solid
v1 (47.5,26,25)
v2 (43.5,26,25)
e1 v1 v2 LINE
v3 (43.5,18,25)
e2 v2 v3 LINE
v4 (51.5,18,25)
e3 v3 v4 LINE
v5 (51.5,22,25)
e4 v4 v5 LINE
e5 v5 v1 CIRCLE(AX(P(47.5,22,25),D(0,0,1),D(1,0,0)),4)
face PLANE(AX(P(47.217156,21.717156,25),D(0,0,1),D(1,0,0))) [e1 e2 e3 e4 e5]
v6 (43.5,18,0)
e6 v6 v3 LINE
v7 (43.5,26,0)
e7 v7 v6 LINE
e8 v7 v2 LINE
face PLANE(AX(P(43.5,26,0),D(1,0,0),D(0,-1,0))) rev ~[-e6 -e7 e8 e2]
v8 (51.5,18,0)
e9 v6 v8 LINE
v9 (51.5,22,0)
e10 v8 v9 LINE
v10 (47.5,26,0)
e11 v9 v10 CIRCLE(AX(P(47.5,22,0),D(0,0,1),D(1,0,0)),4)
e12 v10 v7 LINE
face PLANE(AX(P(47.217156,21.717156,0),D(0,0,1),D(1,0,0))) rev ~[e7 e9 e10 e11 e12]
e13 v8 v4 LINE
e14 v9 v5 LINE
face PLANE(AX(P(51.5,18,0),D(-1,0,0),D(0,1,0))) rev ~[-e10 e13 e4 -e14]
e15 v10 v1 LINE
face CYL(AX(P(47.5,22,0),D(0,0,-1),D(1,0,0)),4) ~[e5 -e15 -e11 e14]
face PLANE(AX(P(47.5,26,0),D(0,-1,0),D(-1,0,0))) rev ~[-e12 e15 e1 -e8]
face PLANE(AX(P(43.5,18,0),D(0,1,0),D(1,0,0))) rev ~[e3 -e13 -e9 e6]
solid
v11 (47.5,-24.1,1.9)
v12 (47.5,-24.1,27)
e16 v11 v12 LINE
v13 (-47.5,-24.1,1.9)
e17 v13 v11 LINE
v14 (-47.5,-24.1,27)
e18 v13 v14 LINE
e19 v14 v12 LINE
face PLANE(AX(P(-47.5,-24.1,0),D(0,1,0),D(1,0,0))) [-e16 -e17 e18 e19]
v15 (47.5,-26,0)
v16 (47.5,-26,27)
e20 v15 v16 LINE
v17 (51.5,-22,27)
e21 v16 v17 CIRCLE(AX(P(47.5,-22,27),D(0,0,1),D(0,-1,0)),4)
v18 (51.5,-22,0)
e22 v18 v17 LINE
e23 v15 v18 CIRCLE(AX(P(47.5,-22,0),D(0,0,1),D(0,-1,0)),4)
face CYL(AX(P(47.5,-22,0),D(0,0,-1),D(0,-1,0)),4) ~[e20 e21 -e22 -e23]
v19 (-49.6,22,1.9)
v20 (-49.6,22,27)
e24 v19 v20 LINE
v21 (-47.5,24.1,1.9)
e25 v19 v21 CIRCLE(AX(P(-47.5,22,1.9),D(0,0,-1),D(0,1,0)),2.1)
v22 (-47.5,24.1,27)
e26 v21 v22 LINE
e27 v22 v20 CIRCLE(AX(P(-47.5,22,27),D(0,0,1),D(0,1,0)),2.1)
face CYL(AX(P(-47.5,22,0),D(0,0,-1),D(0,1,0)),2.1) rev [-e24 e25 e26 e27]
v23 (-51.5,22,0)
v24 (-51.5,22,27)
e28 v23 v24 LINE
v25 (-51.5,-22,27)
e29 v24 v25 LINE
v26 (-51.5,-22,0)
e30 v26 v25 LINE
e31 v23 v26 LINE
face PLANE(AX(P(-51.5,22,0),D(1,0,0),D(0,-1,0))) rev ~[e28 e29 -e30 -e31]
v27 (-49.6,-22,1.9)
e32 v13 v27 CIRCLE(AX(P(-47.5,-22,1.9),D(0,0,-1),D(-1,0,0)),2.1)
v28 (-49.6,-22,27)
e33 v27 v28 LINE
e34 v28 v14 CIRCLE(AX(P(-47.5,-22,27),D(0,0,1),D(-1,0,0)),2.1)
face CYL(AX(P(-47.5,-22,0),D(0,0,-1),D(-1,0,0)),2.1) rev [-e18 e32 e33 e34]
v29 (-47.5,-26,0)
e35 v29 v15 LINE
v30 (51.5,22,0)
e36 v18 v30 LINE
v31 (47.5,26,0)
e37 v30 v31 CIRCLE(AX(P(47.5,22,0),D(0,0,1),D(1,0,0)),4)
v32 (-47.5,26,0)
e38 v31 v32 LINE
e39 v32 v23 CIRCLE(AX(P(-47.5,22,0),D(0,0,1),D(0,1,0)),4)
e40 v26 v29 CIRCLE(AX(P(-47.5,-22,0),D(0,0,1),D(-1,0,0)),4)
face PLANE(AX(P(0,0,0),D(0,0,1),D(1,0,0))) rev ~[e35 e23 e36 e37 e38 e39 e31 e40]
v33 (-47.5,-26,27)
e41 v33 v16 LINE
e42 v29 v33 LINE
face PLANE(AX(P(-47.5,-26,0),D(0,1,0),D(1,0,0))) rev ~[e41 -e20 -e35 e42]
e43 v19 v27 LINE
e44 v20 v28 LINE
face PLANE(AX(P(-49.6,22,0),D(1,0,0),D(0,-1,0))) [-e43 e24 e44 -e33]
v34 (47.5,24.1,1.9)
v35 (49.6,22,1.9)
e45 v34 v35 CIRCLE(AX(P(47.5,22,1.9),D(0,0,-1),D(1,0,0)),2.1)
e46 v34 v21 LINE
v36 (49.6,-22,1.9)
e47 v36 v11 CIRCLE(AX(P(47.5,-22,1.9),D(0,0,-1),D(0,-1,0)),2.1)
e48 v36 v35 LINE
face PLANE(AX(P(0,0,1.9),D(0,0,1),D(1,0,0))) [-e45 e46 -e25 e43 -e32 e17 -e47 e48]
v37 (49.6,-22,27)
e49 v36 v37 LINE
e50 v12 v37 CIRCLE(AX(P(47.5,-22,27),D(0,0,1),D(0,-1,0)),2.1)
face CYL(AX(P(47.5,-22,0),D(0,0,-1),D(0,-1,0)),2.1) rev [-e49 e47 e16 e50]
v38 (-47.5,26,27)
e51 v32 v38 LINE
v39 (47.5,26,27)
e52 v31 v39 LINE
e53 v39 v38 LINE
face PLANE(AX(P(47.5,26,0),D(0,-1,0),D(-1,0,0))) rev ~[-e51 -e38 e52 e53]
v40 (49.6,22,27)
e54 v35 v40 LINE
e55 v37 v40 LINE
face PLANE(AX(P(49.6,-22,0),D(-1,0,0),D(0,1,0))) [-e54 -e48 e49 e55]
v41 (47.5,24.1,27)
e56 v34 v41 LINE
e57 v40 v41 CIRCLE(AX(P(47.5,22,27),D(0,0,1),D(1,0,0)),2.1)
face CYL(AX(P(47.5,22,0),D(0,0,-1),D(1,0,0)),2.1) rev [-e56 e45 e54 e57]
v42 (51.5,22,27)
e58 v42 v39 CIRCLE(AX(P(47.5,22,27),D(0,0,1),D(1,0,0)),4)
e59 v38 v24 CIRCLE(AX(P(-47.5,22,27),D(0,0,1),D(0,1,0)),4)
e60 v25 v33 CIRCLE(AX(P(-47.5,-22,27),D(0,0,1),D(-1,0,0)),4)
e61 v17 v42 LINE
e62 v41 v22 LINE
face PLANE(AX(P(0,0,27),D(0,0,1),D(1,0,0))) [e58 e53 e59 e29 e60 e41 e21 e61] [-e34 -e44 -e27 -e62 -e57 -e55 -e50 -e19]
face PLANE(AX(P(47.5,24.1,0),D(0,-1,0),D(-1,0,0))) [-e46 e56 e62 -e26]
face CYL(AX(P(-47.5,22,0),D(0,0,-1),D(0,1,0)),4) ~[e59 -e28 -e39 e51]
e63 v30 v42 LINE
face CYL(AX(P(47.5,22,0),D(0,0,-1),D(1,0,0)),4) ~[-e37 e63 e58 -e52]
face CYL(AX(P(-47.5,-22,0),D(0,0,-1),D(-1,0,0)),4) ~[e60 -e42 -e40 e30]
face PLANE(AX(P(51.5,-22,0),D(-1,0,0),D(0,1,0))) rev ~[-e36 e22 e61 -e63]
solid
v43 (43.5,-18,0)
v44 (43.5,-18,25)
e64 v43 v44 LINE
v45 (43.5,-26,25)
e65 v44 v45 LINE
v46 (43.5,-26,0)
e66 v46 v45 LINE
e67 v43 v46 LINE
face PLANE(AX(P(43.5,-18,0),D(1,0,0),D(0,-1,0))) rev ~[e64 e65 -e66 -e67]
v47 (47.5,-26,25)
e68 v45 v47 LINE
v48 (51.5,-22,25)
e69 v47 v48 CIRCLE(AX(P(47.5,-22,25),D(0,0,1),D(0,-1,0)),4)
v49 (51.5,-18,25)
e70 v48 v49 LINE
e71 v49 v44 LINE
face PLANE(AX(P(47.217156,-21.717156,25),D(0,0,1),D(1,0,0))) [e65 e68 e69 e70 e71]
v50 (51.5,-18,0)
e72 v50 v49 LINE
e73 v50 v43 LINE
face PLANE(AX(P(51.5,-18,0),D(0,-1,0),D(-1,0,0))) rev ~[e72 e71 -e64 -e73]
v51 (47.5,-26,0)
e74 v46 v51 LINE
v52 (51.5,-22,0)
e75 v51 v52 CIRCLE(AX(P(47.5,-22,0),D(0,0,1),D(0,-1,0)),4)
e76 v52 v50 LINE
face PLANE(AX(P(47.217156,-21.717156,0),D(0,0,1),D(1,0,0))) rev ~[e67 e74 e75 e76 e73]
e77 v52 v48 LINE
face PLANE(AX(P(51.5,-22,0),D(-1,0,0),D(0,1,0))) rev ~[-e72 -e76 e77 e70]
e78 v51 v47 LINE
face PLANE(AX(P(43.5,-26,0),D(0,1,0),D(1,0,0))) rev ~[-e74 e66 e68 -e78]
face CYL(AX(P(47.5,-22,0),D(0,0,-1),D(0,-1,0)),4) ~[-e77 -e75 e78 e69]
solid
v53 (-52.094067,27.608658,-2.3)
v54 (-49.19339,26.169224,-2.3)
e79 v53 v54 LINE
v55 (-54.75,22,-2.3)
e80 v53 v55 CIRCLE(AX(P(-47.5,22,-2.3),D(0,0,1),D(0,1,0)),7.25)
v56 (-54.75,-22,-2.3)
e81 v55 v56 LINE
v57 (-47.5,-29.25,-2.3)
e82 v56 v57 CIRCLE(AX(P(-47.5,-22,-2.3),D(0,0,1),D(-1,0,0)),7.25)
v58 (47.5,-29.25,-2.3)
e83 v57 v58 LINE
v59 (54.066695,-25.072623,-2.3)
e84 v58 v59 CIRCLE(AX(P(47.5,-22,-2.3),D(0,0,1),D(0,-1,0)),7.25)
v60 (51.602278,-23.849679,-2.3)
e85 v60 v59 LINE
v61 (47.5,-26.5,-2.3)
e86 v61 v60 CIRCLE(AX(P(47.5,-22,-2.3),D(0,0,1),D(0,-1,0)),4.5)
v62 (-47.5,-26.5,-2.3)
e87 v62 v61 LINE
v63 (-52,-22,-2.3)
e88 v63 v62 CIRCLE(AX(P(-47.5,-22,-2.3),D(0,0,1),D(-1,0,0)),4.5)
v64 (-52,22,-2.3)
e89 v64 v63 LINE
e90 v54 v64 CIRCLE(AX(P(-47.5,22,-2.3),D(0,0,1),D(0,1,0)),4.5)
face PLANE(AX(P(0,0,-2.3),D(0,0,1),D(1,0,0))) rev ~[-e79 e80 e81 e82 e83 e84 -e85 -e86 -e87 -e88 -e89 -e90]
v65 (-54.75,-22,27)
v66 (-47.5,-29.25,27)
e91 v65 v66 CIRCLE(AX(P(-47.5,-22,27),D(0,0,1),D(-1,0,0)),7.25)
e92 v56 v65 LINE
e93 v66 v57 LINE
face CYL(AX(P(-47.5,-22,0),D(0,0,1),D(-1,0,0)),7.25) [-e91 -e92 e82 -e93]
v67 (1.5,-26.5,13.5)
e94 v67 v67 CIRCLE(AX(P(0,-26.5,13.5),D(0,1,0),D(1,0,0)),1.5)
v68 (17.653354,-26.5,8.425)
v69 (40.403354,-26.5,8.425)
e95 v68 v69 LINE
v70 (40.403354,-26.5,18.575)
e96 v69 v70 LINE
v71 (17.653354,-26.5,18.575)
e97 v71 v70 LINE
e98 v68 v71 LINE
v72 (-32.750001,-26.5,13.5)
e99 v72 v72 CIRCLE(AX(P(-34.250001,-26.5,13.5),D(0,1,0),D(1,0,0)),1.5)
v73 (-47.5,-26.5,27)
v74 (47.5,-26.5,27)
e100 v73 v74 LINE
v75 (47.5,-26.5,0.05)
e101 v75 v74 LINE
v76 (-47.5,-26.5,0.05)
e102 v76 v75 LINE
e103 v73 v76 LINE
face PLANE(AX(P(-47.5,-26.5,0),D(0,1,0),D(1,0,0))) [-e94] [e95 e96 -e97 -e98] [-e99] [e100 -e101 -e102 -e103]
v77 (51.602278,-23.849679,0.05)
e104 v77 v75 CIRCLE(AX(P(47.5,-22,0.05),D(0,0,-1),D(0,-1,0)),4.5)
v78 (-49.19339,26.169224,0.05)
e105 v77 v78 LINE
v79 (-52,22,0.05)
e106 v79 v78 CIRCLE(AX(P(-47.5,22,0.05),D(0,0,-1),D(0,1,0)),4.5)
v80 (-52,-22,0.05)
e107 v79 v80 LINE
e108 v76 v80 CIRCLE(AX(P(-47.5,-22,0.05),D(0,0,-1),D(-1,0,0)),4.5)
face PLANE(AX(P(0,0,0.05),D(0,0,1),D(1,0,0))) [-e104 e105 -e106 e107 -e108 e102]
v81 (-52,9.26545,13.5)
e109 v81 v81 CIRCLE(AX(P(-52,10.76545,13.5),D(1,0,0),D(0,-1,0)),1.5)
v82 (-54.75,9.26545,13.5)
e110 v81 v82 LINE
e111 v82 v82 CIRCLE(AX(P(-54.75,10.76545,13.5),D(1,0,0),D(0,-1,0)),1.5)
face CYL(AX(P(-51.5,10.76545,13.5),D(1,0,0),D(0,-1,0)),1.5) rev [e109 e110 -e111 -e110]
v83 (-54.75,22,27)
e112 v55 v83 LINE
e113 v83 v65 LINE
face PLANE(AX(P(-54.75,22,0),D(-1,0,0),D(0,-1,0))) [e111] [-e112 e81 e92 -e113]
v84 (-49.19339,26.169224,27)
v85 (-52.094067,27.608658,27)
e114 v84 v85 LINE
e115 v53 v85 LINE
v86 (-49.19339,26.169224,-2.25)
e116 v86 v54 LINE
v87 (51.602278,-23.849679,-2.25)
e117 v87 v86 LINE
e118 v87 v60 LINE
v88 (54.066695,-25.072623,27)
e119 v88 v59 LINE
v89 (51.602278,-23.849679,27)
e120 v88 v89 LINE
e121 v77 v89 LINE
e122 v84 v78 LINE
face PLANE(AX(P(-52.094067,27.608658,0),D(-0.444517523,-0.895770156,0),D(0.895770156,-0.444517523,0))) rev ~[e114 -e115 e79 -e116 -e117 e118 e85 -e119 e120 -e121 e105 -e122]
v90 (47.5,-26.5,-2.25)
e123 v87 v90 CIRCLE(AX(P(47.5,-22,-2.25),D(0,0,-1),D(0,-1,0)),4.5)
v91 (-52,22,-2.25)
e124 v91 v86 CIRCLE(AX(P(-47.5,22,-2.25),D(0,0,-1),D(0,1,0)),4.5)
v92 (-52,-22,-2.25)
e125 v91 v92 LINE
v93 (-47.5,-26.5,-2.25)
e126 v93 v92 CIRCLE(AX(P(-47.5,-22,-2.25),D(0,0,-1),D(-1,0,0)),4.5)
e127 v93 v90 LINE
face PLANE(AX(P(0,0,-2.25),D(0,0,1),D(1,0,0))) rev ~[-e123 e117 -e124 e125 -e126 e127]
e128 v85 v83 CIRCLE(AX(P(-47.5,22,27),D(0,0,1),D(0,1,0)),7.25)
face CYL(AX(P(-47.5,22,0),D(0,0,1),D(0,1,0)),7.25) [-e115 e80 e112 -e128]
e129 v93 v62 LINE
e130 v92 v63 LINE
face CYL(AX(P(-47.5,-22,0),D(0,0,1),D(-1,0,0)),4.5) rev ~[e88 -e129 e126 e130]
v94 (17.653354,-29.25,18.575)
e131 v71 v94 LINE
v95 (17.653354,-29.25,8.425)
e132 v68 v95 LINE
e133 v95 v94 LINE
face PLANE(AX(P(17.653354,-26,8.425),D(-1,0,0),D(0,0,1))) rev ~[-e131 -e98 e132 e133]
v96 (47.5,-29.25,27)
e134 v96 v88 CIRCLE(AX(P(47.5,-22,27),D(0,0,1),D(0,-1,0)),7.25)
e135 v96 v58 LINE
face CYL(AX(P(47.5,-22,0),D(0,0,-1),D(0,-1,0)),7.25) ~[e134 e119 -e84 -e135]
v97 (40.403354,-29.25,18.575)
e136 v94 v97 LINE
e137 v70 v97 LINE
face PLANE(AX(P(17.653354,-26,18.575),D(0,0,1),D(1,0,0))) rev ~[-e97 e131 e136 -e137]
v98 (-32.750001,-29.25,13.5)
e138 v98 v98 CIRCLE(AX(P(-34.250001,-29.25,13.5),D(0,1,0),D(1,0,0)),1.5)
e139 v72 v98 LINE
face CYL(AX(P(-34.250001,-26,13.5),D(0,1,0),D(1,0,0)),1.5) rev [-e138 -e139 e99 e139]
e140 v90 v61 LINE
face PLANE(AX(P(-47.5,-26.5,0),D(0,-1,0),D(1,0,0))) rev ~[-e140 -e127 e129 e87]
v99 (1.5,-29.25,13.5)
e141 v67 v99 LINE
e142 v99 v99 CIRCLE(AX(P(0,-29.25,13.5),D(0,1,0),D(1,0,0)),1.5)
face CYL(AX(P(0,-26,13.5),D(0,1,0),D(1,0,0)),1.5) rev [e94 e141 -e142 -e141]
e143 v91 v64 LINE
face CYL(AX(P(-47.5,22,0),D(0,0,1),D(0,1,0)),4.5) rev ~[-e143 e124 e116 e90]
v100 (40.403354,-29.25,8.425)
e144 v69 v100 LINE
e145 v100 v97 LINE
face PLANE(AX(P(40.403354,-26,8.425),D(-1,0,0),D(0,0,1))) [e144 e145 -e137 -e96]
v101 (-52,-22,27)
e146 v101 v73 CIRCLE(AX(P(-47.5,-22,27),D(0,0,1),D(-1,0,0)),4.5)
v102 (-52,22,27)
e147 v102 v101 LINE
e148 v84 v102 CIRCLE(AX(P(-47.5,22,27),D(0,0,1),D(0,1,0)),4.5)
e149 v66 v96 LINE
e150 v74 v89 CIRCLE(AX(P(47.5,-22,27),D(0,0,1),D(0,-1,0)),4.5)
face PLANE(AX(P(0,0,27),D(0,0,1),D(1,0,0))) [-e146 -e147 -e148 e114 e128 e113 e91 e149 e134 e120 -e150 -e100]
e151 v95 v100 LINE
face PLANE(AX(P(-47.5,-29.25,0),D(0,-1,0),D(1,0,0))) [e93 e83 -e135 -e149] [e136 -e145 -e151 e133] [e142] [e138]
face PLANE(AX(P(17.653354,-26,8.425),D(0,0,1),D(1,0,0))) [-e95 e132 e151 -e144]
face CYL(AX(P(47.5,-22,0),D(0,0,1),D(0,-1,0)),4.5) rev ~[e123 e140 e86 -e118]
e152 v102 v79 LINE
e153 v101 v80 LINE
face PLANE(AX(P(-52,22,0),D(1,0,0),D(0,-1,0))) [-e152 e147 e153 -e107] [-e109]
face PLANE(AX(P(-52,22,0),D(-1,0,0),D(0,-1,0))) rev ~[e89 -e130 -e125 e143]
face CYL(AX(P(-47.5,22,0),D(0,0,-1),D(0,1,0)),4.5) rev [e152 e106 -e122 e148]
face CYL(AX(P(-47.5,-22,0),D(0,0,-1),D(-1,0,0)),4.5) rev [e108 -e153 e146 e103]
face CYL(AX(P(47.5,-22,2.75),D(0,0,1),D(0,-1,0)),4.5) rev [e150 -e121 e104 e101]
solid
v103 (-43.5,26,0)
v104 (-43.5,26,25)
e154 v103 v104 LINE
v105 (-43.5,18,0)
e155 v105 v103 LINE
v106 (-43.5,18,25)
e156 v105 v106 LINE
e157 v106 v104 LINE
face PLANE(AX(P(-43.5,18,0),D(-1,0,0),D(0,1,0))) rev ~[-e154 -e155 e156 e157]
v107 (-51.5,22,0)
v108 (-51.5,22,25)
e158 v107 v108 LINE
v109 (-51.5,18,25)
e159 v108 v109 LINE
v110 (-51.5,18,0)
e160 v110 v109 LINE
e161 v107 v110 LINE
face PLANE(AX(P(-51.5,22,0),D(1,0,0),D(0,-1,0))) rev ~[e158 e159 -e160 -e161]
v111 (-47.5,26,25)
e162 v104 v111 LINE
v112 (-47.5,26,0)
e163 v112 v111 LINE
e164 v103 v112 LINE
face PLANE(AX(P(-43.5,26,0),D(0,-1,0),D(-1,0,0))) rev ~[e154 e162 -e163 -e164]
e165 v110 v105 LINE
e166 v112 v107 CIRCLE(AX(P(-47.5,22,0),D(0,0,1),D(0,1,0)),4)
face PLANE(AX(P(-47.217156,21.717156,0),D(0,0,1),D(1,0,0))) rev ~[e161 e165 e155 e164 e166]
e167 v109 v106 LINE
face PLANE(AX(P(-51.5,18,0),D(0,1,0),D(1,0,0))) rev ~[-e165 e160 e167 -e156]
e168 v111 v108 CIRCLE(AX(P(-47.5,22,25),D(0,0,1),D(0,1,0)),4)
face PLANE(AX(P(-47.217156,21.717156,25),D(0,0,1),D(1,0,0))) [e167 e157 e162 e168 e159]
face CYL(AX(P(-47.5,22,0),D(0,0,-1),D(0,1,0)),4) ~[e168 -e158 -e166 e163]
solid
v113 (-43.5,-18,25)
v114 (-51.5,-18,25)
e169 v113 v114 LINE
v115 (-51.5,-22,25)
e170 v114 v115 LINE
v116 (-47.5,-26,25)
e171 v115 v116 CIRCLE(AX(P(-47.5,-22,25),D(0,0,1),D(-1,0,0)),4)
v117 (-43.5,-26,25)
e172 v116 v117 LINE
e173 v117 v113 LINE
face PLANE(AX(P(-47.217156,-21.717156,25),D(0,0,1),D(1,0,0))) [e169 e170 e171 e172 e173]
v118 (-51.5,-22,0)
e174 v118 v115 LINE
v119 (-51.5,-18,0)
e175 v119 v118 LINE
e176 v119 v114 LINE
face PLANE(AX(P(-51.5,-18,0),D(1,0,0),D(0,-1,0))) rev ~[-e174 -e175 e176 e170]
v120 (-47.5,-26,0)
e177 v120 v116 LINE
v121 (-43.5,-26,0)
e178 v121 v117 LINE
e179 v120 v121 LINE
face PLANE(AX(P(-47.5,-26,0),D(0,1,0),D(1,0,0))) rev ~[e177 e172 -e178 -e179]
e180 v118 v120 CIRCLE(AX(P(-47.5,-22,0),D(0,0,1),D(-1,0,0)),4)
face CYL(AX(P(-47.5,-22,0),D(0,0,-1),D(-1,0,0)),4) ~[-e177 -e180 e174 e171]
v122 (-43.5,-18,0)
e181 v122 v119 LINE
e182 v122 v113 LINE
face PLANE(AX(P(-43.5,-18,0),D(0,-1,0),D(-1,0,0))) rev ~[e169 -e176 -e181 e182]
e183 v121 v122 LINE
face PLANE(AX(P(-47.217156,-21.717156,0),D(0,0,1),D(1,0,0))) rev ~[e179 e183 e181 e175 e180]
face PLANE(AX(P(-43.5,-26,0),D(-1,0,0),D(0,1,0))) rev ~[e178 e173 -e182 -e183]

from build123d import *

# Parameters (mm, degrees)
F1_DEPTH  = 27
F2_T      = -1.9
F4_DEPTH  = 25
F9_DEPTH  = 27
F10_T     = -2.75
F6_R      = 1.5
F6_W      = 22.75
F6_H      = 10.15
F11_DEPTH = 25
F5_R      = 1.5
F12_DEPTH = 25
F14_DEPTH = 30
F15_DEPTH = 5
F16_DEPTH = 2.3
F17_DEPTH = 2.7


with BuildPart() as f1:
    # F0 (on Top) → F1 (new body)
    with BuildSketch(Plane.XY):
        Polygon((43.5, 18), (43.5, 26), (-43.5, 26), (-43.5, 18), (-51.5, 18), (-51.5, -18), (-43.5, -18), (-43.5, -26), (43.5, -26), (43.5, -18), (51.5, -18), (51.5, 18), align=None)
        with BuildLine():
            Line((-43.5, 18), (-43.5, 26))
            Line((-43.5, 26), (-47.5, 26))
            ThreePointArc((-47.5, 26), (-50.3284271247, 24.8284271247), (-51.5, 22))
            Line((-51.5, 22), (-51.5, 18))
            Line((-51.5, 18), (-43.5, 18))
        make_face()
        with BuildLine():
            ThreePointArc((51.5, 22), (50.3284271247, 24.8284271247), (47.5, 26))
            Line((47.5, 26), (43.5, 26))
            Line((43.5, 26), (43.5, 18))
            Line((43.5, 18), (51.5, 18))
            Line((51.5, 18), (51.5, 22))
        make_face()
        with BuildLine():
            Line((51.5, -22), (51.5, -18))
            Line((51.5, -18), (43.5, -18))
            Line((43.5, -18), (43.5, -26))
            Line((43.5, -26), (47.5, -26))
            ThreePointArc((47.5, -26), (50.3284271247, -24.8284271247), (51.5, -22))
        make_face()
        with BuildLine():
            Line((-43.5, -18), (-51.5, -18))
            Line((-51.5, -18), (-51.5, -22))
            ThreePointArc((-51.5, -22), (-50.3284271247, -24.8284271247), (-47.5, -26))
            Line((-47.5, -26), (-43.5, -26))
            Line((-43.5, -26), (-43.5, -18))
        make_face()
    extrude(amount=F1_DEPTH)

    # F2
    f2_openings = [f1.faces().sort_by_distance(p)[0] for p in [
        (0, 0, 27),
    ]]
    offset(amount=F2_T, openings=f2_openings)


with BuildPart() as f4:
    # F3 (on face) → F4 (new body)
    with BuildSketch(Plane.XY):
        with BuildLine():
            Line((-43.5, 18), (-43.5, 26))
            Line((-43.5, 26), (-47.5, 26))
            ThreePointArc((-47.5, 26), (-50.3284271247, 24.8284271247), (-51.5, 22))
            Line((-51.5, 22), (-51.5, 18))
            Line((-51.5, 18), (-43.5, 18))
        make_face()
    extrude(amount=F4_DEPTH)


with BuildPart() as f4b:
    # F0 (on Top) → F4, piece 2 (new body)
    with BuildSketch(Plane.XY):
        with BuildLine():
            Line((-43.5, -18), (-51.5, -18))
            Line((-51.5, -18), (-51.5, -22))
            ThreePointArc((-51.5, -22), (-50.3284271247, -24.8284271247), (-47.5, -26))
            Line((-47.5, -26), (-43.5, -26))
            Line((-43.5, -26), (-43.5, -18))
        make_face()
    extrude(amount=F4_DEPTH)


with BuildPart() as f4c:
    # F0 (on Top) → F4, piece 3 (new body)
    with BuildSketch(Plane.XY):
        with BuildLine():
            Line((51.5, -22), (51.5, -18))
            Line((51.5, -18), (43.5, -18))
            Line((43.5, -18), (43.5, -26))
            Line((43.5, -26), (47.5, -26))
            ThreePointArc((47.5, -26), (50.3284271247, -24.8284271247), (51.5, -22))
        make_face()
    extrude(amount=F4_DEPTH)


with BuildPart() as f4d:
    # F0 (on Top) → F4, piece 4 (new body)
    with BuildSketch(Plane.XY):
        with BuildLine():
            ThreePointArc((51.5, 22), (50.3284271247, 24.8284271247), (47.5, 26))
            Line((47.5, 26), (43.5, 26))
            Line((43.5, 26), (43.5, 18))
            Line((43.5, 18), (51.5, 18))
            Line((51.5, 18), (51.5, 22))
        make_face()
    extrude(amount=F4_DEPTH)


with BuildPart() as f9:
    # F8 (on Top) → F9 (new body)
    with BuildSketch(Plane.XY):
        with BuildLine():
            Line((47.5, 29.25), (-47.5, 29.25))
            ThreePointArc((-47.5, 29.25), (-52.6265241636, 27.1265241636), (-54.75, 22))
            Line((-54.75, 22), (-54.75, -22))
            ThreePointArc((-54.75, -22), (-52.6265241636, -27.1265241636), (-47.5, -29.25))
            Line((-47.5, -29.25), (47.5, -29.25))
            ThreePointArc((47.5, -29.25), (52.6265241636, -27.1265241636), (54.75, -22))
            Line((54.75, -22), (54.75, 22))
            ThreePointArc((54.75, 22), (52.6265241636, 27.1265241636), (47.5, 29.25))
        make_face()
    extrude(amount=F9_DEPTH)

    # F10
    f10_openings = [f9.faces().sort_by_distance(p)[0] for p in [
        (0, 0, 27),
    ]]
    offset(amount=F10_T, openings=f10_openings)

    # F6 (on face) → F11 (cut)
    with BuildSketch(Plane.XZ.offset(26)):
        with Locations((-34.2500010431, 13.5)):
            Circle(F6_R)
        with Locations((0, 13.5)):
            Circle(F6_R)
        with Locations((29.0283542126, 13.5)):
            Rectangle(F6_W, F6_H)
    extrude(amount=F11_DEPTH, mode=Mode.SUBTRACT)

    # F5 (on face) → F12 (cut)
    with BuildSketch(Plane(origin=(-51.5, 0, 0), x_dir=(0, -1, 0), z_dir=(-1, 0, 0))):
        with Locations((-10.7654500753, 13.5)):
            Circle(F5_R)
    extrude(amount=F12_DEPTH, mode=Mode.SUBTRACT)

    # F13 (on Top) → F14 (cut)
    with BuildSketch(Plane.XY):
        Polygon((65.3300657868, 29.3469112366), (-55.5969104171, 29.3469112366), (62.0856769383, -29.0519669652), align=None)
    extrude(amount=F14_DEPTH, mode=Mode.SUBTRACT)

    # F15 (add): a face of the model
    f15_faces = [f9.faces().sort_by_distance(p)[0] for p in [
        (-15.8065422029, -8.455255524, 2.75),
    ]]
    extrude(f15_faces, amount=-F15_DEPTH)

    # F16 (add): a face of the model
    f16_faces = [f9.faces().sort_by_distance(p)[0] for p in [
        (-51.1894899225, 25.7891492293, 0),
    ]]
    extrude(f16_faces, amount=F16_DEPTH)

    # F17 (cut): a face of the model
    f17_faces = [f9.faces().sort_by_distance(p)[0] for p in [
        (-15.8065422029, -8.455255524, 2.75),
    ]]
    extrude(f17_faces, amount=-F17_DEPTH, mode=Mode.SUBTRACT)


solid = Compound([f1.part, f4.part, f4b.part, f4c.part, f4d.part, f9.part])
